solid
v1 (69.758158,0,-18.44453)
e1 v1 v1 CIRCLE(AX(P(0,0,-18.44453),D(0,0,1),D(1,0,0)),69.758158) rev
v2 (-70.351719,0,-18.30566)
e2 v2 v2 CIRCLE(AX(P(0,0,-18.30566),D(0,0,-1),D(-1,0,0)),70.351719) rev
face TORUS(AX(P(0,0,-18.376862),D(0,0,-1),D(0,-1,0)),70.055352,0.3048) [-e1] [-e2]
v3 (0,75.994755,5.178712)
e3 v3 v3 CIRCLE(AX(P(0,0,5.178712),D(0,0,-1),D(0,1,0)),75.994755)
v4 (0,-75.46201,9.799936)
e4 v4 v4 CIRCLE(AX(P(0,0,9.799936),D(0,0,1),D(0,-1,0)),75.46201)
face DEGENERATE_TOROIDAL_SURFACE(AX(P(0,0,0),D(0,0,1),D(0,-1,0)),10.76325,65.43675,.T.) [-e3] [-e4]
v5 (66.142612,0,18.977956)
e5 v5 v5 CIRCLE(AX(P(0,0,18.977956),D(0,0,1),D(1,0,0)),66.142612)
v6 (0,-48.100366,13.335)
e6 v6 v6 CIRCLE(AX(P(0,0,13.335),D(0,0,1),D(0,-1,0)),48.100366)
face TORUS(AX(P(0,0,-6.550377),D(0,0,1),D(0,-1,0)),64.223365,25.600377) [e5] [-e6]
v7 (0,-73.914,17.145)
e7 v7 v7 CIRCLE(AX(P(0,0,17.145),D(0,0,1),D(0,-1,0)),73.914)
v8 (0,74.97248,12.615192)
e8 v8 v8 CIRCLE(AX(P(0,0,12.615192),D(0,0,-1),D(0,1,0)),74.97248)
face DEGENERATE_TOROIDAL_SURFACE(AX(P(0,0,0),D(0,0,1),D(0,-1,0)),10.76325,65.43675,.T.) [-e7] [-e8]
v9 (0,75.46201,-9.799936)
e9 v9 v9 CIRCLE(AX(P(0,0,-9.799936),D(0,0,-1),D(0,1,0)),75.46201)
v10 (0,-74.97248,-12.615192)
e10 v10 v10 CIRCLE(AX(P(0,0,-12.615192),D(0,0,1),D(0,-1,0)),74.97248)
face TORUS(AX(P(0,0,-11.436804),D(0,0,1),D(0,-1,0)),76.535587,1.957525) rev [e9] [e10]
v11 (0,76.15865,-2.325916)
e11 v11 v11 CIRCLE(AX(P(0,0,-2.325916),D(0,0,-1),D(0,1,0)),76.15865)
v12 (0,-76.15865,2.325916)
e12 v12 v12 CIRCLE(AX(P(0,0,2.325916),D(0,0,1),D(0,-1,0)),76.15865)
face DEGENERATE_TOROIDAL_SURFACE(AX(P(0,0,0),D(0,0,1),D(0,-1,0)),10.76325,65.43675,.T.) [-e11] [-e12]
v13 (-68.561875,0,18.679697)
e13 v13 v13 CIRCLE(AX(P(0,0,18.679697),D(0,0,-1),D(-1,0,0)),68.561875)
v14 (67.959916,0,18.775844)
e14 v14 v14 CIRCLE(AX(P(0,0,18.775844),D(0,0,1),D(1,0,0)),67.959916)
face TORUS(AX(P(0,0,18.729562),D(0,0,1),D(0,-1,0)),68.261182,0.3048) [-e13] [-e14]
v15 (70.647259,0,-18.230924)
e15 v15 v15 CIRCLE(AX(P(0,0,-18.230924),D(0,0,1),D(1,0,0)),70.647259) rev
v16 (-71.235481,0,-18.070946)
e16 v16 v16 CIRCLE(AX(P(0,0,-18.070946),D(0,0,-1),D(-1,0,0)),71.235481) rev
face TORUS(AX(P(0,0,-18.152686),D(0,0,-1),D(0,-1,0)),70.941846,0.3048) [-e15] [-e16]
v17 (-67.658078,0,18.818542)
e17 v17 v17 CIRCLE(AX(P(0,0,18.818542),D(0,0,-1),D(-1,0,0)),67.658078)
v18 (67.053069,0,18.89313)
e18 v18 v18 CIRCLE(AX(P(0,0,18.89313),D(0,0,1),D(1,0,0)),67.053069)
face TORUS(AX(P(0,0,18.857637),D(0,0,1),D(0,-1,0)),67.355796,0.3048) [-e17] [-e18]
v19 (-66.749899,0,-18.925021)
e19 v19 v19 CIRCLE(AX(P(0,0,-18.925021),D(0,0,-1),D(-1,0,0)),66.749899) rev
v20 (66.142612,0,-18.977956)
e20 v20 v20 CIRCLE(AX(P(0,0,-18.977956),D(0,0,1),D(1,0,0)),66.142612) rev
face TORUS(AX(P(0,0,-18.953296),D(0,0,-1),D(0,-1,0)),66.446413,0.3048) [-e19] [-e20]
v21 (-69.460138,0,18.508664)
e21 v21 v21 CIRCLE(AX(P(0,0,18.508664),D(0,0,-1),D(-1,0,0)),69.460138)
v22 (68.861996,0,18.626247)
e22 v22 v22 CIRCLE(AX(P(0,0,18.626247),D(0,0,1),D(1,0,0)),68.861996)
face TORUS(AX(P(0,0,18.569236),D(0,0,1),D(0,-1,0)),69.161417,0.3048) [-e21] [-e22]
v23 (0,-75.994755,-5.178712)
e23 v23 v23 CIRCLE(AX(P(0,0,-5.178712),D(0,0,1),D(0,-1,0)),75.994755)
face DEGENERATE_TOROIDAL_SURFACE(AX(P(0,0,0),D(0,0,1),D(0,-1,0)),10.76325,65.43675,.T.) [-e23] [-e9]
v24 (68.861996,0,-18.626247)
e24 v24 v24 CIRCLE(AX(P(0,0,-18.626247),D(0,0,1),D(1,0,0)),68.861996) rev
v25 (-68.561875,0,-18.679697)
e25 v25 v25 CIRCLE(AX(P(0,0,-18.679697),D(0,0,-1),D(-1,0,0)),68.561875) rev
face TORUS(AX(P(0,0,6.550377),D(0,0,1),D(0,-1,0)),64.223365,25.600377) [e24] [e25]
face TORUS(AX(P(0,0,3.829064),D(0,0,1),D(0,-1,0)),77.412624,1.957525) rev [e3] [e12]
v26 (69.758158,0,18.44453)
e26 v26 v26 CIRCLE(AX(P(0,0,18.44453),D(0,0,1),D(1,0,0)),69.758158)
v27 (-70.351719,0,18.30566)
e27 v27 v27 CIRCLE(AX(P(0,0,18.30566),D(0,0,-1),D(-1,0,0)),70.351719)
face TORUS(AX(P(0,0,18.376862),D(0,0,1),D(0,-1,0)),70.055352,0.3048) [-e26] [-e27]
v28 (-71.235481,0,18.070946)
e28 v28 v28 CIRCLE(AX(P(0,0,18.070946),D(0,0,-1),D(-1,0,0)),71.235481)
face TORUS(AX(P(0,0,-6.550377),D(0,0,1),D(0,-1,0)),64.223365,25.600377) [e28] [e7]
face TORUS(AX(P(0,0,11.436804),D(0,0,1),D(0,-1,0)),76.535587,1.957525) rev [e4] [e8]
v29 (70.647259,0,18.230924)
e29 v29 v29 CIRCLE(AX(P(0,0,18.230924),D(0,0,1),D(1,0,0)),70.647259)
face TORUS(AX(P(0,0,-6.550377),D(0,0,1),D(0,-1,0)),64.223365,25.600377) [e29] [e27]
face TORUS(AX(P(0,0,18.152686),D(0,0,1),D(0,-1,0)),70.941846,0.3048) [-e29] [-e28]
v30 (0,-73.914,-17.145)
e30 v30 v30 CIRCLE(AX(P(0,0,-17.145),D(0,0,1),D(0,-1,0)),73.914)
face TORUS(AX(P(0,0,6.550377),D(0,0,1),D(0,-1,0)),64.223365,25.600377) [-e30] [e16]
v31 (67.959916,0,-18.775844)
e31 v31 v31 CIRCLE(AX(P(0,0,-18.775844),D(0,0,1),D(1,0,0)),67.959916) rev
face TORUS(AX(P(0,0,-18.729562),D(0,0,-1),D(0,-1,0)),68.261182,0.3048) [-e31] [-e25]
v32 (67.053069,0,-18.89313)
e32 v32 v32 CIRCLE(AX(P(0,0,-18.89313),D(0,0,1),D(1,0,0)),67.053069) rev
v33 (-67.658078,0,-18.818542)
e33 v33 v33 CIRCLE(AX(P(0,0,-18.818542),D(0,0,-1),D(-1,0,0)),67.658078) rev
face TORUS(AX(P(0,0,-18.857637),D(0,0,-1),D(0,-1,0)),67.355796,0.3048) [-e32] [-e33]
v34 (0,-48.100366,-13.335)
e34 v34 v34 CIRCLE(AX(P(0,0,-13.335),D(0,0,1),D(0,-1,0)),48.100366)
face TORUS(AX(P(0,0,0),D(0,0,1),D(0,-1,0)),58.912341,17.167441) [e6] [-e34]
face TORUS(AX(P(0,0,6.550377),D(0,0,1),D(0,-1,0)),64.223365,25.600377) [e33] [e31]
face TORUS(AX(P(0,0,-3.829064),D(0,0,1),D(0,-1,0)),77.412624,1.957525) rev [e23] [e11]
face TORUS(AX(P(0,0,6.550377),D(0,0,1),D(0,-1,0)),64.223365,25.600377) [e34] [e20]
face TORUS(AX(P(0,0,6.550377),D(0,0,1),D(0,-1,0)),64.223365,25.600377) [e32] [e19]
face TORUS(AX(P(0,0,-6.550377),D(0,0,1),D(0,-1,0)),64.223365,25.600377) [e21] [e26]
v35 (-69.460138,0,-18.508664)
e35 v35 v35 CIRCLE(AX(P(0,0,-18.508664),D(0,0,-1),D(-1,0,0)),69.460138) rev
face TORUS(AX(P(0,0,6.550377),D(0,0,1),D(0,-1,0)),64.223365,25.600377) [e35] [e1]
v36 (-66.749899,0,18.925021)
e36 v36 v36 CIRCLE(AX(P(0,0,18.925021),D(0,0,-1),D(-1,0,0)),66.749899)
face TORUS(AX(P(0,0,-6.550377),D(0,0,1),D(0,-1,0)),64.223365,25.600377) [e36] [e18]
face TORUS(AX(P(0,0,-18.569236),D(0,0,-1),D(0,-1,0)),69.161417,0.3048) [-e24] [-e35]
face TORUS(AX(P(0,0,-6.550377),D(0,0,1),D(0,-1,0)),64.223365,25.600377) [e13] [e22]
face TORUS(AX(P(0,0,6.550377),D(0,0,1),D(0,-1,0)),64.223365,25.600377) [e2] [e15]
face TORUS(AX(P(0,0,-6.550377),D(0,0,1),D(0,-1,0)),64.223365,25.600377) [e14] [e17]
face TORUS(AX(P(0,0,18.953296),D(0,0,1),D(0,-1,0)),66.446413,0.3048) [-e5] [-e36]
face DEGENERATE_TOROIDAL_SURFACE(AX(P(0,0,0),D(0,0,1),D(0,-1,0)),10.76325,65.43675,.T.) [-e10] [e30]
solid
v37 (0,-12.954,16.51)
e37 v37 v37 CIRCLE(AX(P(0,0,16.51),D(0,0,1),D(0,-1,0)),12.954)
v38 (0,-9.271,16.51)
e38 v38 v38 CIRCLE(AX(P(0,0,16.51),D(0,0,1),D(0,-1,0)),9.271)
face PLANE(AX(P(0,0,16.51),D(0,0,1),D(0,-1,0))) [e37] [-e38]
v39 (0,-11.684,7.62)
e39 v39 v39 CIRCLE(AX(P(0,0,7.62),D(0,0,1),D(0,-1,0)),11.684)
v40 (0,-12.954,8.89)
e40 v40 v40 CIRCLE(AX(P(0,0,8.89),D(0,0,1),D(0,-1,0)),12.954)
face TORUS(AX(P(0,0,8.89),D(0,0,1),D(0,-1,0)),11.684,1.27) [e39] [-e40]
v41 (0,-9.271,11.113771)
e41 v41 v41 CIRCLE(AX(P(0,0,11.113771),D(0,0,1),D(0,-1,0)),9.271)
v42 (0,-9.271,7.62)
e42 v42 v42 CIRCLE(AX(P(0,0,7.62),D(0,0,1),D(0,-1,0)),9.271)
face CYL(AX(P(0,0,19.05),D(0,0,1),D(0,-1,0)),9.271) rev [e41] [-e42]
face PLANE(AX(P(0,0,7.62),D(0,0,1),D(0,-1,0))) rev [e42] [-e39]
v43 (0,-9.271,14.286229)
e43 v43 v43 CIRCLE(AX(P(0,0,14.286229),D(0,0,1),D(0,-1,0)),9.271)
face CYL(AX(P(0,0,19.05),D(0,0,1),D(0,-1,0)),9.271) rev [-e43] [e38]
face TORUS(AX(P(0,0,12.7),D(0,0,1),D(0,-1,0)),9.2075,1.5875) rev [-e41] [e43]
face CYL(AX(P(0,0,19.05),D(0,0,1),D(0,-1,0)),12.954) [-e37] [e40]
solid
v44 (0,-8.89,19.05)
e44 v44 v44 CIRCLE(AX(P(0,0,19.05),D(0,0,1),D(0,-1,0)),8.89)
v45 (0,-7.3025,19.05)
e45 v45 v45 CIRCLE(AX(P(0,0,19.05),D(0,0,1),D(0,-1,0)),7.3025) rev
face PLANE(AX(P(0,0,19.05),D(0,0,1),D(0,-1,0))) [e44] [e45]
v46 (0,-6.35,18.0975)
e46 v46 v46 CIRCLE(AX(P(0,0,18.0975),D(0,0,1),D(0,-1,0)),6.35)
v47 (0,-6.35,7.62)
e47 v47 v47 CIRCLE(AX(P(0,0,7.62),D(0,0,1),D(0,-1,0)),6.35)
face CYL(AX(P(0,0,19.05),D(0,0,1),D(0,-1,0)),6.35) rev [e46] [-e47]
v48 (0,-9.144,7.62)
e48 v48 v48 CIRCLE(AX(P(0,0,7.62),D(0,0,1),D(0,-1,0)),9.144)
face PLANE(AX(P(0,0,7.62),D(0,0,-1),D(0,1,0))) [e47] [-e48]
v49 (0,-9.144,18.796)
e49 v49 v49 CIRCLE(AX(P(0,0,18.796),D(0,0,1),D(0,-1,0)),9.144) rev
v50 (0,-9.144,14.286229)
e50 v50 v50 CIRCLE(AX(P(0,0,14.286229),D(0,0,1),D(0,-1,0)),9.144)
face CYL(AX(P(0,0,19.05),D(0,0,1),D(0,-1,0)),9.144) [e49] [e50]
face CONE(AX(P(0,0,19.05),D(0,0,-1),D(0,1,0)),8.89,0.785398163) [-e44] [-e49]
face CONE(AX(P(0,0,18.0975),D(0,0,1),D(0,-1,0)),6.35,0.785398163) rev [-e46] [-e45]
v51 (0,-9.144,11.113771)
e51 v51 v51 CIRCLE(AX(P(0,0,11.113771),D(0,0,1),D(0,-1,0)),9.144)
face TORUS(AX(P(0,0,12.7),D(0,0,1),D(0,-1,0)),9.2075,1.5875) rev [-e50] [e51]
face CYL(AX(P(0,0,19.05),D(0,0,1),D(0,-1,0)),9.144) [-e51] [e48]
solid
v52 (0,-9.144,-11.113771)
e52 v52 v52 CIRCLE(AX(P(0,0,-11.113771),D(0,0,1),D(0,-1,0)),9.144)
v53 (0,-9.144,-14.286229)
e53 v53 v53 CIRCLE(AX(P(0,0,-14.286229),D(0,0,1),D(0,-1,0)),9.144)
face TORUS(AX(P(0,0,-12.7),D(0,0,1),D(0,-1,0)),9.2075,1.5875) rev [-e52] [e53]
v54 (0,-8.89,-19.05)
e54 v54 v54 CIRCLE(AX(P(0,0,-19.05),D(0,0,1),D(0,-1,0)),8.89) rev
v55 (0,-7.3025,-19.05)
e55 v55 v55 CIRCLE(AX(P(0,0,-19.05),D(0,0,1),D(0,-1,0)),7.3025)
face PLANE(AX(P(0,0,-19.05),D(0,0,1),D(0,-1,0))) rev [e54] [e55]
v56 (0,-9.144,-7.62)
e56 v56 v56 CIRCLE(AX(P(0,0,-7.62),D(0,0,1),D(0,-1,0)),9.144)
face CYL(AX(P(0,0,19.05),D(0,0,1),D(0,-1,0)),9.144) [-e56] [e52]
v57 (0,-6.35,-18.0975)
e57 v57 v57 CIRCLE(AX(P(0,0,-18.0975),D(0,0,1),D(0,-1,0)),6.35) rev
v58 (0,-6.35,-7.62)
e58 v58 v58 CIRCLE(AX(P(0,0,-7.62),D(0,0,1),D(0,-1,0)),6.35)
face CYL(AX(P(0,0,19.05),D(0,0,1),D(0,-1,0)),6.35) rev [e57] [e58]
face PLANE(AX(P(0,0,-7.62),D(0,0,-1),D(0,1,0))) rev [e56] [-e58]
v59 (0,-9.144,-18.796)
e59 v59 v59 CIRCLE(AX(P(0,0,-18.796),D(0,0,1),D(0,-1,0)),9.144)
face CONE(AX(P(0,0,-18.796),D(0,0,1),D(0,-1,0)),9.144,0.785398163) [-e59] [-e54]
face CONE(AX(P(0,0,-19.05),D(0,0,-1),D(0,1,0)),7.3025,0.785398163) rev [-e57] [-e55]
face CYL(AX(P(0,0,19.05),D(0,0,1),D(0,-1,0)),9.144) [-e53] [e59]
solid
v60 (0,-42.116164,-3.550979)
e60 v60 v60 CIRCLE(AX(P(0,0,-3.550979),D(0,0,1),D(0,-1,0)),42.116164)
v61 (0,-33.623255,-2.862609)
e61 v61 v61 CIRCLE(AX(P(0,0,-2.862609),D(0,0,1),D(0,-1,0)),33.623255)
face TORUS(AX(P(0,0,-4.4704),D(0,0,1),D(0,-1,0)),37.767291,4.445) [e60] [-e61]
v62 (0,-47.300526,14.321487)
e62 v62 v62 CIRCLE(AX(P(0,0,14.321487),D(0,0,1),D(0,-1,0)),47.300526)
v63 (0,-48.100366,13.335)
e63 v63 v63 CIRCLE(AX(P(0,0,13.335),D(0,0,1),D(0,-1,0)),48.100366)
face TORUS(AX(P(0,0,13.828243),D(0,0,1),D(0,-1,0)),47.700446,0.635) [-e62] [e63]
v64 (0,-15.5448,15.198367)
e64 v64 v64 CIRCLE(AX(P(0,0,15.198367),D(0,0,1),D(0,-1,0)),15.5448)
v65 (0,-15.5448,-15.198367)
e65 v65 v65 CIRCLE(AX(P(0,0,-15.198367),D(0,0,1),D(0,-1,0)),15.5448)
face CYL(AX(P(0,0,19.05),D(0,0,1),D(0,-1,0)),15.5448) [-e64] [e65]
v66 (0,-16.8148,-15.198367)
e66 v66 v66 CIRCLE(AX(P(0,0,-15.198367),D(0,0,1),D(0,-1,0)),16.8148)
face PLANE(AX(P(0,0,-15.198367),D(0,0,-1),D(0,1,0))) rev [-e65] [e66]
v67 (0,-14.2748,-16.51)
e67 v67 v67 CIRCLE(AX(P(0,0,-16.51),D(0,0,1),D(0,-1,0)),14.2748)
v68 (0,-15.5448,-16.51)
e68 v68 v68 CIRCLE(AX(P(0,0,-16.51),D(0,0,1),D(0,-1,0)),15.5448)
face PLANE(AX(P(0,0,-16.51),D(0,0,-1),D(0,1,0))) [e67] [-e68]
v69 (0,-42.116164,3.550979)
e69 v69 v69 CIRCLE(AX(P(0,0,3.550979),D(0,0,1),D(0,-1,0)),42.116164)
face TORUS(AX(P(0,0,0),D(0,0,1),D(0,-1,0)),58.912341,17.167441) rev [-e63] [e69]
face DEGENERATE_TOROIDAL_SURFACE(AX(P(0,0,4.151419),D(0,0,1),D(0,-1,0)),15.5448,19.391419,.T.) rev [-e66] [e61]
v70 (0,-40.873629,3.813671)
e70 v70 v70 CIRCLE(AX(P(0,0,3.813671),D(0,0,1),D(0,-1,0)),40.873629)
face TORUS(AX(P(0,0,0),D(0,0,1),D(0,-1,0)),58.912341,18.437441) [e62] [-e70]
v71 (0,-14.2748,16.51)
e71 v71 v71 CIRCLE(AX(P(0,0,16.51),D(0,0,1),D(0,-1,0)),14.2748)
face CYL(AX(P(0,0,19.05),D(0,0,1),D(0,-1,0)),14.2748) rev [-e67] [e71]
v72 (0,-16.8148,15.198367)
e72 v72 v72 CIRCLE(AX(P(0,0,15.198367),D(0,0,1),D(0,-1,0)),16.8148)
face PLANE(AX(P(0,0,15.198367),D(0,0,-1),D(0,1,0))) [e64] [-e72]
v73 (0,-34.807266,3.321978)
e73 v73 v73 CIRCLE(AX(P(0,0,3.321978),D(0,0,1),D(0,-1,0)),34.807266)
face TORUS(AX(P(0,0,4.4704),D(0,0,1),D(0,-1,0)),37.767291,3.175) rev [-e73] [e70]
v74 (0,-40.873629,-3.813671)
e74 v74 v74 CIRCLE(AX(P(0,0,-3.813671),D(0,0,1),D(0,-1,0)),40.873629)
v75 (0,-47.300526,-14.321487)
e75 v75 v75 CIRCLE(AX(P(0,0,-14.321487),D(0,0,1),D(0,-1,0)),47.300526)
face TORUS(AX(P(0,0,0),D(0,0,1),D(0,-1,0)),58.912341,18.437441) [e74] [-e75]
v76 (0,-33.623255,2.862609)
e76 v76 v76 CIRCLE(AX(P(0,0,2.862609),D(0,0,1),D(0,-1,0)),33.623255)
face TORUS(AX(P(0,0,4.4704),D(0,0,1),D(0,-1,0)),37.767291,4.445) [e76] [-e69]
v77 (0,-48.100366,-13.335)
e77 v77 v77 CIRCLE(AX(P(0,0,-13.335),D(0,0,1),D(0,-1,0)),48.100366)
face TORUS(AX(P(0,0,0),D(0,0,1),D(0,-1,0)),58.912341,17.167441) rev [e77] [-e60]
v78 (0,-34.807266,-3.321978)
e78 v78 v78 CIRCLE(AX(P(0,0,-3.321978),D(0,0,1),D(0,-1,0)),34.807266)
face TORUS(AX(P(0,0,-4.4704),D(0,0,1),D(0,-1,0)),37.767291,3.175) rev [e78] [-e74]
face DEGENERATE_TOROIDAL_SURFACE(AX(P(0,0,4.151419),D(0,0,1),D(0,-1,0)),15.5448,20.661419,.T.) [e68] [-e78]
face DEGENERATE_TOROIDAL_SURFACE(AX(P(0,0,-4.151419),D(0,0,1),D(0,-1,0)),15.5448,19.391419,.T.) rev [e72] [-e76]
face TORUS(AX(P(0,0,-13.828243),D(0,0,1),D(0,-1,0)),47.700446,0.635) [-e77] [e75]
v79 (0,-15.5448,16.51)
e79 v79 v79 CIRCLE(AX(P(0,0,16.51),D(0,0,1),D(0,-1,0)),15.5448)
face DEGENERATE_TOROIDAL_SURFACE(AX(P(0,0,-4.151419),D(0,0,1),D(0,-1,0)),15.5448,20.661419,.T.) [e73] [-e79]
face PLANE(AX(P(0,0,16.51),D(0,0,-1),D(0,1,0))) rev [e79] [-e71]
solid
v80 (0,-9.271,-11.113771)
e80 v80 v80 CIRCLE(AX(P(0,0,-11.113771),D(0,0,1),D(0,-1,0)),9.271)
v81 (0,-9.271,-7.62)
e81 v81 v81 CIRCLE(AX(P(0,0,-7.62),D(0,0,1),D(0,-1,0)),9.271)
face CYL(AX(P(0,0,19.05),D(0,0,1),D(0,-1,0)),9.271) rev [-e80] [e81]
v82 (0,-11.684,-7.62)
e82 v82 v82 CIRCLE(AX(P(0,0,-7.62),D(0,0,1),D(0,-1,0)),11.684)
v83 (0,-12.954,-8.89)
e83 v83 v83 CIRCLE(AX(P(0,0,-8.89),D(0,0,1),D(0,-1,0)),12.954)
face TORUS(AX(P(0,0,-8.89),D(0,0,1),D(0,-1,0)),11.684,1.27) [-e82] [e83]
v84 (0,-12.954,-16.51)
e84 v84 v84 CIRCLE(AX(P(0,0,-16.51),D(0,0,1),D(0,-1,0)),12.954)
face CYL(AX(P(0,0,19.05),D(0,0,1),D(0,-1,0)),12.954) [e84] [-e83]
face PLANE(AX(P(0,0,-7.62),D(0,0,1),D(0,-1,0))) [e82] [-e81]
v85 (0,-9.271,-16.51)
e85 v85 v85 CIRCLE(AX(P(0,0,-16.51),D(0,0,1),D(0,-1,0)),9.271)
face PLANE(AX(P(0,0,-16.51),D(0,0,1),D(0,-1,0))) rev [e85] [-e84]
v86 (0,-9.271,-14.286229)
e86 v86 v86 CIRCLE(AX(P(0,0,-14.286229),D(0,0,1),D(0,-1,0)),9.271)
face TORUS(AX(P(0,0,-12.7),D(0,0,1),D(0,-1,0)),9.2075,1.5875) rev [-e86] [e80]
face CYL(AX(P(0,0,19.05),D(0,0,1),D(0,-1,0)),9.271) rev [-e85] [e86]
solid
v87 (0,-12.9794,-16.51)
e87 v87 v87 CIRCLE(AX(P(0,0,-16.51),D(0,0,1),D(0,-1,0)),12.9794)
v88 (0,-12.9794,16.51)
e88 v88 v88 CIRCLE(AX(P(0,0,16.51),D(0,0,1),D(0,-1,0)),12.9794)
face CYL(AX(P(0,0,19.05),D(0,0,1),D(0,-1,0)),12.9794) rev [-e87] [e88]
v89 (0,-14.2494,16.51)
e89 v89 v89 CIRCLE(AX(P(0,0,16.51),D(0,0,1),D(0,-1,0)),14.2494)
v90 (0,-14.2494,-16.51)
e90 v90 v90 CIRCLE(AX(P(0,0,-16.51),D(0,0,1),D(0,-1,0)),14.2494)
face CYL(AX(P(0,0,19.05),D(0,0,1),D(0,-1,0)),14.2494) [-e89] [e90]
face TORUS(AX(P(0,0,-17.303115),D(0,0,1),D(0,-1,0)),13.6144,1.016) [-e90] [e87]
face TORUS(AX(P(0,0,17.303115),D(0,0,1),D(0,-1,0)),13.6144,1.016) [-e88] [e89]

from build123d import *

# Parameters (mm, degrees)
CHAMFER1_SIZE = 0.9525
CHAMFER2_SIZE = 0.9525
CHAMFER3_SIZE = 0.254
CHAMFER4_SIZE = 0.254
SKETCH13_R    = 0.3048


# Read off the part's stored shape, not the designer's step: Cut-Revolve2
with BuildPart() as part:
    # Sketch2 → Revolve1 (revolve)
    with BuildSketch(Plane(origin=(0, 0, 0), x_dir=(0, 0, -1), z_dir=(1, 0, 0)), mode=Mode.PRIVATE) as revolve1_sk:
        with BuildLine():
            ThreePointArc((17.145, 73.914), (0, 76.2), (-17.145, 73.914))
            ThreePointArc((-17.145, 73.914), (-18.775626493, 60.485337264), (-13.335, 48.100366169))
            ThreePointArc((-13.335, 48.100366169), (0, 41.7449), (13.335, 48.100366169))
            ThreePointArc((13.335, 48.100366169), (18.775626493, 60.485337264), (17.145, 73.914))
        make_face()
    revolve(revolve1_sk.sketch.rotate(Axis((0, 0, 19.05), (0, 0, -1)), 180), axis=Axis((0, 0, 19.05), (0, 0, -1)))


with BuildPart() as body_2:
    # Sketch2<5> → Revolve7 (revolve)
    with BuildSketch(Plane(origin=(0, 0, 0), x_dir=(0, 0, -1), z_dir=(1, 0, 0)), mode=Mode.PRIVATE) as revolve7_sk:
        with BuildLine():
            ThreePointArc((-3.321977667, 34.807265708), (-12.897117819, 27.217058974), (-16.51, 15.5448))
            Line((-16.51, 15.5448), (-16.51, 14.2748))
            Line((-16.51, 14.2748), (16.51, 14.2748))
            Line((16.51, 14.2748), (16.51, 15.5448))
            ThreePointArc((16.51, 15.5448), (12.897117819, 27.217058974), (3.321977667, 34.807265708))
            ThreePointArc((3.321977667, 34.807265708), (1.305777958, 38.023791397), (3.813670837, 40.873628601))
            ThreePointArc((3.813670837, 40.873628601), (9.620147428, 43.183641383), (14.321486597, 47.300526064))
            ThreePointArc((14.321486597, 47.300526064), (14.228163351, 48.193689415), (13.335, 48.100366169))
            ThreePointArc((13.335, 48.100366169), (8.957496492, 44.267059002), (3.550979171, 42.116163546))
            ThreePointArc((3.550979171, 42.116163546), (0.039929141, 38.126391461), (2.862608733, 33.623255495))
            ThreePointArc((2.862608733, 33.623255495), (11.481677799, 27.017960747), (15.198367326, 16.8148))
            Line((15.198367326, 16.8148), (15.198367326, 15.5448))
            Line((15.198367326, 15.5448), (-15.198367326, 15.5448))
            Line((-15.198367326, 15.5448), (-15.198367326, 16.8148))
            ThreePointArc((-15.198367326, 16.8148), (-11.481677799, 27.017960747), (-2.862608733, 33.623255495))
            ThreePointArc((-2.862608733, 33.623255495), (-0.039929141, 38.126391461), (-3.550979171, 42.116163546))
            ThreePointArc((-3.550979171, 42.116163546), (-8.957496492, 44.267059002), (-13.335, 48.100366169))
            ThreePointArc((-13.335, 48.100366169), (-14.228163351, 48.193689415), (-14.321486597, 47.300526064))
            ThreePointArc((-14.321486597, 47.300526064), (-9.620147428, 43.183641383), (-3.813670837, 40.873628601))
            ThreePointArc((-3.813670837, 40.873628601), (-1.305777958, 38.023791397), (-3.321977667, 34.807265708))
        make_face()
    revolve(revolve7_sk.sketch.rotate(Axis((0, 0, 19.05), (0, 0, -1)), 180), axis=Axis((0, 0, 19.05), (0, 0, -1)))


with BuildPart() as body_3:
    # Sketch2<6> → Revolve8 (revolve)
    with BuildSketch(Plane(origin=(0, 0, 0), x_dir=(0, 0, -1), z_dir=(1, 0, 0)), mode=Mode.PRIVATE) as revolve8_sk:
        with BuildLine():
            ThreePointArc((16.51, 14.2494), (18.319114746, 13.6144), (16.51, 12.9794))
            Line((16.51, 12.9794), (-16.51, 12.9794))
            ThreePointArc((-16.51, 12.9794), (-18.319114746, 13.6144), (-16.51, 14.2494))
            Line((-16.51, 14.2494), (16.51, 14.2494))
        make_face()
    revolve(revolve8_sk.sketch.rotate(Axis((0, 0, 19.05), (0, 0, -1)), 180), axis=Axis((0, 0, 19.05), (0, 0, -1)))


with BuildPart() as body_4:
    # Sketch2<7> → Revolve9 (revolve)
    with BuildSketch(Plane(origin=(0, 0, 0), x_dir=(0, 0, -1), z_dir=(1, 0, 0)), mode=Mode.PRIVATE) as revolve9_sk:
        with BuildLine():
            Line((16.51, 12.954), (8.89, 12.954))
            ThreePointArc((8.89, 12.954), (7.991974388, 12.582025612), (7.62, 11.684))
            Line((7.62, 11.684), (7.62, 9.271))
            Line((7.62, 9.271), (11.113770508, 9.271))
            ThreePointArc((11.113770508, 9.271), (12.7, 10.795), (14.286229492, 9.271))
            Line((14.286229492, 9.271), (16.51, 9.271))
            Line((16.51, 9.271), (16.51, 12.954))
        make_face()
        with BuildLine():
            ThreePointArc((-11.113770508, 9.271), (-12.7, 10.795), (-14.286229492, 9.271))
            Line((-14.286229492, 9.271), (-16.51, 9.271))
            Line((-16.51, 9.271), (-16.51, 12.954))
            Line((-16.51, 12.954), (-8.89, 12.954))
            ThreePointArc((-8.89, 12.954), (-7.991974388, 12.582025612), (-7.62, 11.684))
            Line((-7.62, 11.684), (-7.62, 9.271))
            Line((-7.62, 9.271), (-11.113770508, 9.271))
        make_face()
        with BuildLine():
            ThreePointArc((-14.286229492, 9.144), (-12.7, 7.62), (-11.113770508, 9.144))
            Line((-11.113770508, 9.144), (-7.62, 9.144))
            Line((-7.62, 9.144), (-7.62, 6.35))
            Line((-7.62, 6.35), (-19.05, 6.35))
            Line((-19.05, 6.35), (-19.05, 9.144))
            Line((-19.05, 9.144), (-14.286229492, 9.144))
        make_face()
        with BuildLine():
            Line((19.05, 9.144), (14.286229492, 9.144))
            ThreePointArc((14.286229492, 9.144), (12.7, 7.62), (11.113770508, 9.144))
            Line((11.113770508, 9.144), (7.62, 9.144))
            Line((7.62, 9.144), (7.62, 6.35))
            Line((7.62, 6.35), (19.05, 6.35))
            Line((19.05, 6.35), (19.05, 9.144))
        make_face()
    revolve(revolve9_sk.sketch.rotate(Axis((0, 0, 19.05), (0, 0, -1)), 180), axis=Axis((0, 0, 19.05), (0, 0, -1)))

    # Chamfer1
    chamfer1_edges = [body_4.edges().sort_by_distance(p)[0] for p in [
        (0, 6.35, 19.05),
    ]]
    chamfer(chamfer1_edges, length=CHAMFER1_SIZE)

    # Chamfer2
    chamfer2_edges = [body_4.edges().sort_by_distance(p)[0] for p in [
        (0, 6.35, -19.05),
    ]]
    chamfer(chamfer2_edges, length=CHAMFER2_SIZE)

    # Chamfer3
    chamfer3_edges = [body_4.edges().sort_by_distance(p)[0] for p in [
        (0, 9.144, 19.05),
    ]]
    chamfer(chamfer3_edges, length=CHAMFER3_SIZE)

    # Chamfer4
    chamfer4_edges = [body_4.edges().sort_by_distance(p)[0] for p in [
        (0, 9.144, -19.05),
    ]]
    chamfer(chamfer4_edges, length=CHAMFER4_SIZE)


with BuildPart() as body_5:
    # Sketch13 → Revolve10 (revolve)
    with BuildSketch(Plane(origin=(0, 0, 0), x_dir=(0, 0, -1), z_dir=(1, 0, 0)), mode=Mode.PRIVATE) as revolve10_sk:
        with Locations((-18.15268573, 70.941846309)):
            Circle(SKETCH13_R)
        with Locations((-18.953296417, 66.446413301)):
            Circle(SKETCH13_R)
        with Locations((-18.85763705, 67.355795864)):
            Circle(SKETCH13_R)
        with Locations((-18.729562353, 68.261182098)):
            Circle(SKETCH13_R)
        with Locations((-18.569235725, 69.161416918)):
            Circle(SKETCH13_R)
        with Locations((-18.376861707, 70.055351814)):
            Circle(SKETCH13_R)
    revolve10 = revolve(revolve10_sk.sketch.rotate(Axis((0, 0, 19.05), (0, 0, -1)), 180), axis=Axis((0, 0, 19.05), (0, 0, -1)))


with BuildPart() as part_1:
    add(part.part)

    # Mirror2: Revolve10 across plane
    add(revolve10.mirror(Plane.XY))

    # Cut-Revolve2 outline → Cut-Revolve2 (revolve, cut)
    with BuildSketch(Plane.XZ):
        with BuildLine():
            Line((75.462009627, -12.615192444), (75.462009627, -9.799936393))
            ThreePointArc((75.462009627, -9.799936393), (74.607001124, -11.101452401), (74.972479634, -12.615192444))
            Line((74.972479634, -12.615192444), (75.462009627, -12.615192444))
        make_face()
        with BuildLine():
            ThreePointArc((76.158650195, -2.325915714), (75.458321653, -3.716787165), (75.994754632, -5.178711622))
            Line((75.994754632, -5.178711622), (76.158650195, -5.178711622))
            Line((76.158650195, -5.178711622), (76.158650195, -2.325915714))
        make_face()
        with BuildLine():
            Line((76.158650195, 2.325915714), (76.158650195, 5.178711622))
            Line((76.158650195, 5.178711622), (75.994754631, 5.178711622))
            ThreePointArc((75.994754631, 5.178711622), (75.458321653, 3.716787165), (76.158650195, 2.325915714))
        make_face()
        with BuildLine():
            Line((75.462009627, 12.615192444), (74.972479634, 12.615192444))
            ThreePointArc((74.972479634, 12.615192444), (74.607001124, 11.101452401), (75.462009627, 9.799936393))
            Line((75.462009627, 9.799936393), (75.462009627, 12.615192444))
        make_face()
    revolve(axis=Axis((0, 0, 0), (0, 0, 1)), mode=Mode.SUBTRACT)

    # Combine1: union body 5
    add(body_5.part)


solid = Compound([body_2.part, body_3.part, body_4.part, part_1.part])
